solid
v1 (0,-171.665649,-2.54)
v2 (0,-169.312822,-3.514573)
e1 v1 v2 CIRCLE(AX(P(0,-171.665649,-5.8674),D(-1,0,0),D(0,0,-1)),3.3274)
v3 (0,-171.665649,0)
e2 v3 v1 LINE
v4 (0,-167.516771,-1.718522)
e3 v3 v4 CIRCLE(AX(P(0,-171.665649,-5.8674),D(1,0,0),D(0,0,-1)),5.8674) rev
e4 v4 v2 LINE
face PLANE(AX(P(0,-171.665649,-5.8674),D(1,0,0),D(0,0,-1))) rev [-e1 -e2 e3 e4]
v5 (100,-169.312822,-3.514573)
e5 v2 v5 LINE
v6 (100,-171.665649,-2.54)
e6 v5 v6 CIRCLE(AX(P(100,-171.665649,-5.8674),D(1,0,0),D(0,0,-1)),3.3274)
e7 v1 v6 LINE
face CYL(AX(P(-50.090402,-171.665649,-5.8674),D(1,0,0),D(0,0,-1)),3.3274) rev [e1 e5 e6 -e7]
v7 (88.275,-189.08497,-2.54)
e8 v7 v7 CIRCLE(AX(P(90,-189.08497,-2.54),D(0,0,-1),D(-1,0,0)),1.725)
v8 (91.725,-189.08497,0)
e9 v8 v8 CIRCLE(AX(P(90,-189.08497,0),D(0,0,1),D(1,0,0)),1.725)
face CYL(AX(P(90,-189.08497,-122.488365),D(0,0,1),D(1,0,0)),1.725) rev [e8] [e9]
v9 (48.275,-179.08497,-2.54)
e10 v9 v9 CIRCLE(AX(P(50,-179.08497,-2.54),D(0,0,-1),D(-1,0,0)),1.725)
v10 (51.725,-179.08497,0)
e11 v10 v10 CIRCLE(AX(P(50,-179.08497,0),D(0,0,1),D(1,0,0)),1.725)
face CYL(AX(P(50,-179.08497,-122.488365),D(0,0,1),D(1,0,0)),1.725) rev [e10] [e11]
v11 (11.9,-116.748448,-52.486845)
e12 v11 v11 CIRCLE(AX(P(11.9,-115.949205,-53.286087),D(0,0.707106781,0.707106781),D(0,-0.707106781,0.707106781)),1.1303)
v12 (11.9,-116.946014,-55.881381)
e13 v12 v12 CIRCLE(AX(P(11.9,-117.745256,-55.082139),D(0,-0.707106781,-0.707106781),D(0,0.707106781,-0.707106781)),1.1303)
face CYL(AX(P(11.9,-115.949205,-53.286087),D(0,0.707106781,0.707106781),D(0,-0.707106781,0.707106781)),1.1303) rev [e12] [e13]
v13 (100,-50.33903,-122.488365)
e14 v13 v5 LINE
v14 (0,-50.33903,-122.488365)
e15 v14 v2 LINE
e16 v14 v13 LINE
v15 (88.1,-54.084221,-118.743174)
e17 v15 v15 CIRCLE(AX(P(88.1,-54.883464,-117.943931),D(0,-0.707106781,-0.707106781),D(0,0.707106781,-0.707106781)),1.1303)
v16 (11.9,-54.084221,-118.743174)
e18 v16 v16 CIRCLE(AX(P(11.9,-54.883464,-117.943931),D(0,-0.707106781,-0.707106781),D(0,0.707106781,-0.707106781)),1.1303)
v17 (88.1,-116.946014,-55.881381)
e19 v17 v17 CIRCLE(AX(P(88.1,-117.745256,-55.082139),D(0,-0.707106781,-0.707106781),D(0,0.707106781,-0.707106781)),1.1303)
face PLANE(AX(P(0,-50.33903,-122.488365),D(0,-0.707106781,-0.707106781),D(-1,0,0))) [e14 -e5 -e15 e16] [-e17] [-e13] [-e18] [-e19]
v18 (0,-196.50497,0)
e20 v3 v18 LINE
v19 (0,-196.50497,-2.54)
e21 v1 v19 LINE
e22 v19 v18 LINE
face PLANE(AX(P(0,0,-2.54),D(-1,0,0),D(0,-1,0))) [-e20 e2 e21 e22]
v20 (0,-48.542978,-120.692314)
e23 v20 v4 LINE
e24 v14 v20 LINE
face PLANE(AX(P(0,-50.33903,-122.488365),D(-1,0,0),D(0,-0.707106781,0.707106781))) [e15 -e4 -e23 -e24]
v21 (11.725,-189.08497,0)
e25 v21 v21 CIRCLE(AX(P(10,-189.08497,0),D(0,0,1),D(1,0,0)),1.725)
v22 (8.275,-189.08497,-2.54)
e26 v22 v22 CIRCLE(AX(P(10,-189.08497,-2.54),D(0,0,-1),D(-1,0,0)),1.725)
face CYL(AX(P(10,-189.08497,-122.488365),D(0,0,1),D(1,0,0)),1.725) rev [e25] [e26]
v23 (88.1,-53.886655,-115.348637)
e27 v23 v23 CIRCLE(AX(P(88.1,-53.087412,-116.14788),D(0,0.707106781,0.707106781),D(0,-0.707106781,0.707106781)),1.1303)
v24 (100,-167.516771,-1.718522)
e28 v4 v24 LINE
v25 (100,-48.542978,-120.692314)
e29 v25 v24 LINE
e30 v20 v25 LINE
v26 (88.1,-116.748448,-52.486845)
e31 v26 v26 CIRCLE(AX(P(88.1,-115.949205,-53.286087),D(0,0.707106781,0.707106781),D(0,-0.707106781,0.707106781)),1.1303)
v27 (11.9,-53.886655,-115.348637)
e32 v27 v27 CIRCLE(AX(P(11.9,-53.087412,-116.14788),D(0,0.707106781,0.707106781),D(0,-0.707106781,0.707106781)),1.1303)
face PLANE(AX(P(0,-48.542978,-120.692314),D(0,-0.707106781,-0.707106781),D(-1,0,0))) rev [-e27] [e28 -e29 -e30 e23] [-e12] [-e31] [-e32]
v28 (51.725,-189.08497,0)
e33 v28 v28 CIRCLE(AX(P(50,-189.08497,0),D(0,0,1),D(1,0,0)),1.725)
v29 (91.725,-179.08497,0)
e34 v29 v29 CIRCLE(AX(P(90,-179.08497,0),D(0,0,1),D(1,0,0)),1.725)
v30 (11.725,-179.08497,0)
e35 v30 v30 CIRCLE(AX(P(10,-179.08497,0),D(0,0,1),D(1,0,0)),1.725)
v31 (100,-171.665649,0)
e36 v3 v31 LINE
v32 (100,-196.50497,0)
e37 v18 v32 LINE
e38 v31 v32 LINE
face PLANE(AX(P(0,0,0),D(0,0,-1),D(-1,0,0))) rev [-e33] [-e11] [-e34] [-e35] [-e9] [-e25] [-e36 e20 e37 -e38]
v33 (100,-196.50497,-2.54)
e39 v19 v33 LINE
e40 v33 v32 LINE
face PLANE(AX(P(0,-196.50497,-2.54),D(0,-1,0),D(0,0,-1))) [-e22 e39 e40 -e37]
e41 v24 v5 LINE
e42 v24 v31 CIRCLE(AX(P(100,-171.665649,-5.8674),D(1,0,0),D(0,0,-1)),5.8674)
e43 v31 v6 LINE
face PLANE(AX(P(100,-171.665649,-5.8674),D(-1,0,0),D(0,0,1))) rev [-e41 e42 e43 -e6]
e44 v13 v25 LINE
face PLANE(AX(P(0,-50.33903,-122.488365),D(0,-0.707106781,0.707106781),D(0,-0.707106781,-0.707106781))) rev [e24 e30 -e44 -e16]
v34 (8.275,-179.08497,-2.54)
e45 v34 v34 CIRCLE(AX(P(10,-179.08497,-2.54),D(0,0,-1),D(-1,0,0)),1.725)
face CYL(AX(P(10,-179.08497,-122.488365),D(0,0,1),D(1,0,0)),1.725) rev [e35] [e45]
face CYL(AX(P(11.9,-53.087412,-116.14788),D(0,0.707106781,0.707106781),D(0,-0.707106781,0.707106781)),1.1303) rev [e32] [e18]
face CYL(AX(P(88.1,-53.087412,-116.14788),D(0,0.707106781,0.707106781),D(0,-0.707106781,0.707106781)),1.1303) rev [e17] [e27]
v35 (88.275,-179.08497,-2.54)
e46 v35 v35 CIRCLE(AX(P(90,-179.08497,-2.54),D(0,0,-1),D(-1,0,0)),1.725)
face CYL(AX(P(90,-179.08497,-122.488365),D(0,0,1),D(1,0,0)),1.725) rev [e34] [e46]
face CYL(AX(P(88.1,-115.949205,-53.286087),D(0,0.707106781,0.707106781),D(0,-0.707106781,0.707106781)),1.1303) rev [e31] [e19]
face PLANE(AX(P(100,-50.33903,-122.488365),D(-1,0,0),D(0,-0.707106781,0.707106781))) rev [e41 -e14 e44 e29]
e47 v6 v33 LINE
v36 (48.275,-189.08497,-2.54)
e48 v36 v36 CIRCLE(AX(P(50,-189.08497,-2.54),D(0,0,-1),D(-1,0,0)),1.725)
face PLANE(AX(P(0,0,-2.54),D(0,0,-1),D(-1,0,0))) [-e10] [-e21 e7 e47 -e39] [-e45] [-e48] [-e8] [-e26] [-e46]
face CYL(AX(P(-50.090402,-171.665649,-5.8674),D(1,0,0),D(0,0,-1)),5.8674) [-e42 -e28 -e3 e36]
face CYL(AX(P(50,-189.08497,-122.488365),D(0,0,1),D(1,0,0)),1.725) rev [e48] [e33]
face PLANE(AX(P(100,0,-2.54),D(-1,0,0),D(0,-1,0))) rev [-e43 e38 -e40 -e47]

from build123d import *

# Parameters (mm, degrees)
SKETCH1_W                  = 100
SKETCH1_H                  = 196.50497
BASE_FLANGE1_DEPTH         = 2.54
CUT_EXTRUDE1_DEPTH         = 221.500917991
CUT_EXTRUDE1_DEPTH_BACK    = 221.500917991
SKETCH1_4_R                = 1.13
SKETCHED_START             = -70.001308696
SKETCHED_BEND3_OUTLINE_R   = 1.13
SKETCHED_BEND3_DEPTH       = 55.325410031
SKETCHED_BEND3_2_DEPTH     = 100
SKETCHED_BEND3_3_DEPTH     = 100
SKETCHED_START_2           = -123
SKETCHED_BEND3_4_OUTLINE_R = 1.13
SKETCHED_BEND3_4_DEPTH     = 4
CUT_EXTRUDE3_DEPTH         = 253.225301809
CUT_EXTRUDE3_DEPTH_BACK    = 253.225301809
SKETCH19_R                 = 1.725
F_4_40_TAPPED_HOLE1_D      = 2.2606


with BuildPart() as part:
    # Base-Flange1: sheet metal written as solids
    # Sketch1 → Base-Flange1 (new body)
    with BuildSketch(Plane.XY):
        with Locations((50, -98.252485)):
            Rectangle(SKETCH1_W, SKETCH1_H)
    extrude(amount=-BASE_FLANGE1_DEPTH)

    # Sketch1<4> → Cut-Extrude1 (cut, two sides: drawn at the far end of the back side and taken through both)
    with BuildSketch(Plane.XY.offset(-CUT_EXTRUDE1_DEPTH_BACK)):
        with Locations((11.9, -6.4268)):
            Circle(SKETCH1_4_R)
        with Locations((88.1, -6.4268)):
            Circle(SKETCH1_4_R)
        with Locations((88.1, -95.3268)):
            Circle(SKETCH1_4_R)
        with Locations((11.9, -95.3268)):
            Circle(SKETCH1_4_R)
    extrude(amount=CUT_EXTRUDE1_DEPTH + CUT_EXTRUDE1_DEPTH_BACK, mode=Mode.SUBTRACT)

    # Sketched Bend3: read off the stored shape, not the designer's step
    # Sketched Bend3 outline → Sketched Bend3 (cut)
    with BuildSketch(Plane(origin=(0, 0, 0), x_dir=(1, 0, 0), z_dir=(0, 0.707106781186549, 0.707106781186546)).offset(SKETCHED_START)):
        with Locations((88.1, -44.309515504)):
            Circle(SKETCHED_BEND3_OUTLINE_R)
        with Locations((11.9, -44.309515504)):
            Circle(SKETCHED_BEND3_OUTLINE_R)
    extrude(amount=SKETCHED_BEND3_DEPTH, mode=Mode.SUBTRACT)

    # Sketched Bend3 2 outline → Sketched Bend3 2 (cut)
    with BuildSketch(Plane.YZ):
        with BuildLine():
            ThreePointArc((-171.665649191, 0), (-169.42029242, -0.446629231), (-167.516770864, -1.718521672))
            Line((-167.516770864, -1.718521672), (-166.695292536, -2.54))
            Line((-166.695292536, -2.54), (0, -2.54))
            Line((0, -2.54), (0, 0))
            Line((0, 0), (-171.665649191, 0))
        make_face()
    extrude(amount=SKETCHED_BEND3_2_DEPTH, mode=Mode.SUBTRACT)

    # Sketched Bend3 3 outline → Sketched Bend3 3 (add)
    with BuildSketch(Plane.YZ):
        with BuildLine():
            Line((-48.542978443, -120.692314093), (-166.695292536, -2.54))
            Line((-166.695292536, -2.54), (-171.665649191, -2.54))
            ThreePointArc((-171.665649191, -2.54), (-170.392308339, -2.793283244), (-169.312822088, -3.514572896))
            Line((-169.312822088, -3.514572896), (-50.339029667, -122.488365317))
            Line((-50.339029667, -122.488365317), (-48.542978443, -120.692314093))
        make_face()
    extrude(amount=SKETCHED_BEND3_3_DEPTH)

    # Sketched Bend3 4 outline → Sketched Bend3 4 (cut)
    with BuildSketch(Plane(origin=(0, 0, 0), x_dir=(1, 0, 0), z_dir=(0, 0.707106781186549, 0.707106781186546)).offset(SKETCHED_START_2)):
        with Locations((11.9, 44.590484496)):
            Circle(SKETCHED_BEND3_4_OUTLINE_R)
        with Locations((88.1, 44.590484496)):
            Circle(SKETCHED_BEND3_4_OUTLINE_R)
        with Locations((88.1, -44.309515504)):
            Circle(SKETCHED_BEND3_4_OUTLINE_R)
        with Locations((11.9, -44.309515504)):
            Circle(SKETCHED_BEND3_4_OUTLINE_R)
    extrude(amount=SKETCHED_BEND3_4_DEPTH, mode=Mode.SUBTRACT)

    # Sketch19 → Cut-Extrude3 (cut, two sides: drawn at the far end of the back side and taken through both)
    with BuildSketch(Plane.XY.offset(-CUT_EXTRUDE3_DEPTH_BACK)):
        with Locations((10, -179.08497)):
            Circle(SKETCH19_R)
        with Locations((50, -179.08497)):
            Circle(SKETCH19_R)
        with Locations((90, -179.08497)):
            Circle(SKETCH19_R)
        with Locations((50, -189.08497)):
            Circle(SKETCH19_R)
        with Locations((90, -189.08497)):
            Circle(SKETCH19_R)
        with Locations((10, -189.08497)):
            Circle(SKETCH19_R)
    extrude(amount=CUT_EXTRUDE3_DEPTH + CUT_EXTRUDE3_DEPTH_BACK, mode=Mode.SUBTRACT)

    # #4-40 Tapped Hole1 (through all)
    with Locations(Plane(origin=(88.1, -115.949205151, -53.286087384), x_dir=(0, -0.707106781187, 0.707106781187), z_dir=(0, 0.707106781187, 0.707106781187))):
        with Locations((0, 0), (0, -76.2), (-88.9, -76.2), (-88.9, 0)):
            Hole(F_4_40_TAPPED_HOLE1_D / 2)


solid = part.part
